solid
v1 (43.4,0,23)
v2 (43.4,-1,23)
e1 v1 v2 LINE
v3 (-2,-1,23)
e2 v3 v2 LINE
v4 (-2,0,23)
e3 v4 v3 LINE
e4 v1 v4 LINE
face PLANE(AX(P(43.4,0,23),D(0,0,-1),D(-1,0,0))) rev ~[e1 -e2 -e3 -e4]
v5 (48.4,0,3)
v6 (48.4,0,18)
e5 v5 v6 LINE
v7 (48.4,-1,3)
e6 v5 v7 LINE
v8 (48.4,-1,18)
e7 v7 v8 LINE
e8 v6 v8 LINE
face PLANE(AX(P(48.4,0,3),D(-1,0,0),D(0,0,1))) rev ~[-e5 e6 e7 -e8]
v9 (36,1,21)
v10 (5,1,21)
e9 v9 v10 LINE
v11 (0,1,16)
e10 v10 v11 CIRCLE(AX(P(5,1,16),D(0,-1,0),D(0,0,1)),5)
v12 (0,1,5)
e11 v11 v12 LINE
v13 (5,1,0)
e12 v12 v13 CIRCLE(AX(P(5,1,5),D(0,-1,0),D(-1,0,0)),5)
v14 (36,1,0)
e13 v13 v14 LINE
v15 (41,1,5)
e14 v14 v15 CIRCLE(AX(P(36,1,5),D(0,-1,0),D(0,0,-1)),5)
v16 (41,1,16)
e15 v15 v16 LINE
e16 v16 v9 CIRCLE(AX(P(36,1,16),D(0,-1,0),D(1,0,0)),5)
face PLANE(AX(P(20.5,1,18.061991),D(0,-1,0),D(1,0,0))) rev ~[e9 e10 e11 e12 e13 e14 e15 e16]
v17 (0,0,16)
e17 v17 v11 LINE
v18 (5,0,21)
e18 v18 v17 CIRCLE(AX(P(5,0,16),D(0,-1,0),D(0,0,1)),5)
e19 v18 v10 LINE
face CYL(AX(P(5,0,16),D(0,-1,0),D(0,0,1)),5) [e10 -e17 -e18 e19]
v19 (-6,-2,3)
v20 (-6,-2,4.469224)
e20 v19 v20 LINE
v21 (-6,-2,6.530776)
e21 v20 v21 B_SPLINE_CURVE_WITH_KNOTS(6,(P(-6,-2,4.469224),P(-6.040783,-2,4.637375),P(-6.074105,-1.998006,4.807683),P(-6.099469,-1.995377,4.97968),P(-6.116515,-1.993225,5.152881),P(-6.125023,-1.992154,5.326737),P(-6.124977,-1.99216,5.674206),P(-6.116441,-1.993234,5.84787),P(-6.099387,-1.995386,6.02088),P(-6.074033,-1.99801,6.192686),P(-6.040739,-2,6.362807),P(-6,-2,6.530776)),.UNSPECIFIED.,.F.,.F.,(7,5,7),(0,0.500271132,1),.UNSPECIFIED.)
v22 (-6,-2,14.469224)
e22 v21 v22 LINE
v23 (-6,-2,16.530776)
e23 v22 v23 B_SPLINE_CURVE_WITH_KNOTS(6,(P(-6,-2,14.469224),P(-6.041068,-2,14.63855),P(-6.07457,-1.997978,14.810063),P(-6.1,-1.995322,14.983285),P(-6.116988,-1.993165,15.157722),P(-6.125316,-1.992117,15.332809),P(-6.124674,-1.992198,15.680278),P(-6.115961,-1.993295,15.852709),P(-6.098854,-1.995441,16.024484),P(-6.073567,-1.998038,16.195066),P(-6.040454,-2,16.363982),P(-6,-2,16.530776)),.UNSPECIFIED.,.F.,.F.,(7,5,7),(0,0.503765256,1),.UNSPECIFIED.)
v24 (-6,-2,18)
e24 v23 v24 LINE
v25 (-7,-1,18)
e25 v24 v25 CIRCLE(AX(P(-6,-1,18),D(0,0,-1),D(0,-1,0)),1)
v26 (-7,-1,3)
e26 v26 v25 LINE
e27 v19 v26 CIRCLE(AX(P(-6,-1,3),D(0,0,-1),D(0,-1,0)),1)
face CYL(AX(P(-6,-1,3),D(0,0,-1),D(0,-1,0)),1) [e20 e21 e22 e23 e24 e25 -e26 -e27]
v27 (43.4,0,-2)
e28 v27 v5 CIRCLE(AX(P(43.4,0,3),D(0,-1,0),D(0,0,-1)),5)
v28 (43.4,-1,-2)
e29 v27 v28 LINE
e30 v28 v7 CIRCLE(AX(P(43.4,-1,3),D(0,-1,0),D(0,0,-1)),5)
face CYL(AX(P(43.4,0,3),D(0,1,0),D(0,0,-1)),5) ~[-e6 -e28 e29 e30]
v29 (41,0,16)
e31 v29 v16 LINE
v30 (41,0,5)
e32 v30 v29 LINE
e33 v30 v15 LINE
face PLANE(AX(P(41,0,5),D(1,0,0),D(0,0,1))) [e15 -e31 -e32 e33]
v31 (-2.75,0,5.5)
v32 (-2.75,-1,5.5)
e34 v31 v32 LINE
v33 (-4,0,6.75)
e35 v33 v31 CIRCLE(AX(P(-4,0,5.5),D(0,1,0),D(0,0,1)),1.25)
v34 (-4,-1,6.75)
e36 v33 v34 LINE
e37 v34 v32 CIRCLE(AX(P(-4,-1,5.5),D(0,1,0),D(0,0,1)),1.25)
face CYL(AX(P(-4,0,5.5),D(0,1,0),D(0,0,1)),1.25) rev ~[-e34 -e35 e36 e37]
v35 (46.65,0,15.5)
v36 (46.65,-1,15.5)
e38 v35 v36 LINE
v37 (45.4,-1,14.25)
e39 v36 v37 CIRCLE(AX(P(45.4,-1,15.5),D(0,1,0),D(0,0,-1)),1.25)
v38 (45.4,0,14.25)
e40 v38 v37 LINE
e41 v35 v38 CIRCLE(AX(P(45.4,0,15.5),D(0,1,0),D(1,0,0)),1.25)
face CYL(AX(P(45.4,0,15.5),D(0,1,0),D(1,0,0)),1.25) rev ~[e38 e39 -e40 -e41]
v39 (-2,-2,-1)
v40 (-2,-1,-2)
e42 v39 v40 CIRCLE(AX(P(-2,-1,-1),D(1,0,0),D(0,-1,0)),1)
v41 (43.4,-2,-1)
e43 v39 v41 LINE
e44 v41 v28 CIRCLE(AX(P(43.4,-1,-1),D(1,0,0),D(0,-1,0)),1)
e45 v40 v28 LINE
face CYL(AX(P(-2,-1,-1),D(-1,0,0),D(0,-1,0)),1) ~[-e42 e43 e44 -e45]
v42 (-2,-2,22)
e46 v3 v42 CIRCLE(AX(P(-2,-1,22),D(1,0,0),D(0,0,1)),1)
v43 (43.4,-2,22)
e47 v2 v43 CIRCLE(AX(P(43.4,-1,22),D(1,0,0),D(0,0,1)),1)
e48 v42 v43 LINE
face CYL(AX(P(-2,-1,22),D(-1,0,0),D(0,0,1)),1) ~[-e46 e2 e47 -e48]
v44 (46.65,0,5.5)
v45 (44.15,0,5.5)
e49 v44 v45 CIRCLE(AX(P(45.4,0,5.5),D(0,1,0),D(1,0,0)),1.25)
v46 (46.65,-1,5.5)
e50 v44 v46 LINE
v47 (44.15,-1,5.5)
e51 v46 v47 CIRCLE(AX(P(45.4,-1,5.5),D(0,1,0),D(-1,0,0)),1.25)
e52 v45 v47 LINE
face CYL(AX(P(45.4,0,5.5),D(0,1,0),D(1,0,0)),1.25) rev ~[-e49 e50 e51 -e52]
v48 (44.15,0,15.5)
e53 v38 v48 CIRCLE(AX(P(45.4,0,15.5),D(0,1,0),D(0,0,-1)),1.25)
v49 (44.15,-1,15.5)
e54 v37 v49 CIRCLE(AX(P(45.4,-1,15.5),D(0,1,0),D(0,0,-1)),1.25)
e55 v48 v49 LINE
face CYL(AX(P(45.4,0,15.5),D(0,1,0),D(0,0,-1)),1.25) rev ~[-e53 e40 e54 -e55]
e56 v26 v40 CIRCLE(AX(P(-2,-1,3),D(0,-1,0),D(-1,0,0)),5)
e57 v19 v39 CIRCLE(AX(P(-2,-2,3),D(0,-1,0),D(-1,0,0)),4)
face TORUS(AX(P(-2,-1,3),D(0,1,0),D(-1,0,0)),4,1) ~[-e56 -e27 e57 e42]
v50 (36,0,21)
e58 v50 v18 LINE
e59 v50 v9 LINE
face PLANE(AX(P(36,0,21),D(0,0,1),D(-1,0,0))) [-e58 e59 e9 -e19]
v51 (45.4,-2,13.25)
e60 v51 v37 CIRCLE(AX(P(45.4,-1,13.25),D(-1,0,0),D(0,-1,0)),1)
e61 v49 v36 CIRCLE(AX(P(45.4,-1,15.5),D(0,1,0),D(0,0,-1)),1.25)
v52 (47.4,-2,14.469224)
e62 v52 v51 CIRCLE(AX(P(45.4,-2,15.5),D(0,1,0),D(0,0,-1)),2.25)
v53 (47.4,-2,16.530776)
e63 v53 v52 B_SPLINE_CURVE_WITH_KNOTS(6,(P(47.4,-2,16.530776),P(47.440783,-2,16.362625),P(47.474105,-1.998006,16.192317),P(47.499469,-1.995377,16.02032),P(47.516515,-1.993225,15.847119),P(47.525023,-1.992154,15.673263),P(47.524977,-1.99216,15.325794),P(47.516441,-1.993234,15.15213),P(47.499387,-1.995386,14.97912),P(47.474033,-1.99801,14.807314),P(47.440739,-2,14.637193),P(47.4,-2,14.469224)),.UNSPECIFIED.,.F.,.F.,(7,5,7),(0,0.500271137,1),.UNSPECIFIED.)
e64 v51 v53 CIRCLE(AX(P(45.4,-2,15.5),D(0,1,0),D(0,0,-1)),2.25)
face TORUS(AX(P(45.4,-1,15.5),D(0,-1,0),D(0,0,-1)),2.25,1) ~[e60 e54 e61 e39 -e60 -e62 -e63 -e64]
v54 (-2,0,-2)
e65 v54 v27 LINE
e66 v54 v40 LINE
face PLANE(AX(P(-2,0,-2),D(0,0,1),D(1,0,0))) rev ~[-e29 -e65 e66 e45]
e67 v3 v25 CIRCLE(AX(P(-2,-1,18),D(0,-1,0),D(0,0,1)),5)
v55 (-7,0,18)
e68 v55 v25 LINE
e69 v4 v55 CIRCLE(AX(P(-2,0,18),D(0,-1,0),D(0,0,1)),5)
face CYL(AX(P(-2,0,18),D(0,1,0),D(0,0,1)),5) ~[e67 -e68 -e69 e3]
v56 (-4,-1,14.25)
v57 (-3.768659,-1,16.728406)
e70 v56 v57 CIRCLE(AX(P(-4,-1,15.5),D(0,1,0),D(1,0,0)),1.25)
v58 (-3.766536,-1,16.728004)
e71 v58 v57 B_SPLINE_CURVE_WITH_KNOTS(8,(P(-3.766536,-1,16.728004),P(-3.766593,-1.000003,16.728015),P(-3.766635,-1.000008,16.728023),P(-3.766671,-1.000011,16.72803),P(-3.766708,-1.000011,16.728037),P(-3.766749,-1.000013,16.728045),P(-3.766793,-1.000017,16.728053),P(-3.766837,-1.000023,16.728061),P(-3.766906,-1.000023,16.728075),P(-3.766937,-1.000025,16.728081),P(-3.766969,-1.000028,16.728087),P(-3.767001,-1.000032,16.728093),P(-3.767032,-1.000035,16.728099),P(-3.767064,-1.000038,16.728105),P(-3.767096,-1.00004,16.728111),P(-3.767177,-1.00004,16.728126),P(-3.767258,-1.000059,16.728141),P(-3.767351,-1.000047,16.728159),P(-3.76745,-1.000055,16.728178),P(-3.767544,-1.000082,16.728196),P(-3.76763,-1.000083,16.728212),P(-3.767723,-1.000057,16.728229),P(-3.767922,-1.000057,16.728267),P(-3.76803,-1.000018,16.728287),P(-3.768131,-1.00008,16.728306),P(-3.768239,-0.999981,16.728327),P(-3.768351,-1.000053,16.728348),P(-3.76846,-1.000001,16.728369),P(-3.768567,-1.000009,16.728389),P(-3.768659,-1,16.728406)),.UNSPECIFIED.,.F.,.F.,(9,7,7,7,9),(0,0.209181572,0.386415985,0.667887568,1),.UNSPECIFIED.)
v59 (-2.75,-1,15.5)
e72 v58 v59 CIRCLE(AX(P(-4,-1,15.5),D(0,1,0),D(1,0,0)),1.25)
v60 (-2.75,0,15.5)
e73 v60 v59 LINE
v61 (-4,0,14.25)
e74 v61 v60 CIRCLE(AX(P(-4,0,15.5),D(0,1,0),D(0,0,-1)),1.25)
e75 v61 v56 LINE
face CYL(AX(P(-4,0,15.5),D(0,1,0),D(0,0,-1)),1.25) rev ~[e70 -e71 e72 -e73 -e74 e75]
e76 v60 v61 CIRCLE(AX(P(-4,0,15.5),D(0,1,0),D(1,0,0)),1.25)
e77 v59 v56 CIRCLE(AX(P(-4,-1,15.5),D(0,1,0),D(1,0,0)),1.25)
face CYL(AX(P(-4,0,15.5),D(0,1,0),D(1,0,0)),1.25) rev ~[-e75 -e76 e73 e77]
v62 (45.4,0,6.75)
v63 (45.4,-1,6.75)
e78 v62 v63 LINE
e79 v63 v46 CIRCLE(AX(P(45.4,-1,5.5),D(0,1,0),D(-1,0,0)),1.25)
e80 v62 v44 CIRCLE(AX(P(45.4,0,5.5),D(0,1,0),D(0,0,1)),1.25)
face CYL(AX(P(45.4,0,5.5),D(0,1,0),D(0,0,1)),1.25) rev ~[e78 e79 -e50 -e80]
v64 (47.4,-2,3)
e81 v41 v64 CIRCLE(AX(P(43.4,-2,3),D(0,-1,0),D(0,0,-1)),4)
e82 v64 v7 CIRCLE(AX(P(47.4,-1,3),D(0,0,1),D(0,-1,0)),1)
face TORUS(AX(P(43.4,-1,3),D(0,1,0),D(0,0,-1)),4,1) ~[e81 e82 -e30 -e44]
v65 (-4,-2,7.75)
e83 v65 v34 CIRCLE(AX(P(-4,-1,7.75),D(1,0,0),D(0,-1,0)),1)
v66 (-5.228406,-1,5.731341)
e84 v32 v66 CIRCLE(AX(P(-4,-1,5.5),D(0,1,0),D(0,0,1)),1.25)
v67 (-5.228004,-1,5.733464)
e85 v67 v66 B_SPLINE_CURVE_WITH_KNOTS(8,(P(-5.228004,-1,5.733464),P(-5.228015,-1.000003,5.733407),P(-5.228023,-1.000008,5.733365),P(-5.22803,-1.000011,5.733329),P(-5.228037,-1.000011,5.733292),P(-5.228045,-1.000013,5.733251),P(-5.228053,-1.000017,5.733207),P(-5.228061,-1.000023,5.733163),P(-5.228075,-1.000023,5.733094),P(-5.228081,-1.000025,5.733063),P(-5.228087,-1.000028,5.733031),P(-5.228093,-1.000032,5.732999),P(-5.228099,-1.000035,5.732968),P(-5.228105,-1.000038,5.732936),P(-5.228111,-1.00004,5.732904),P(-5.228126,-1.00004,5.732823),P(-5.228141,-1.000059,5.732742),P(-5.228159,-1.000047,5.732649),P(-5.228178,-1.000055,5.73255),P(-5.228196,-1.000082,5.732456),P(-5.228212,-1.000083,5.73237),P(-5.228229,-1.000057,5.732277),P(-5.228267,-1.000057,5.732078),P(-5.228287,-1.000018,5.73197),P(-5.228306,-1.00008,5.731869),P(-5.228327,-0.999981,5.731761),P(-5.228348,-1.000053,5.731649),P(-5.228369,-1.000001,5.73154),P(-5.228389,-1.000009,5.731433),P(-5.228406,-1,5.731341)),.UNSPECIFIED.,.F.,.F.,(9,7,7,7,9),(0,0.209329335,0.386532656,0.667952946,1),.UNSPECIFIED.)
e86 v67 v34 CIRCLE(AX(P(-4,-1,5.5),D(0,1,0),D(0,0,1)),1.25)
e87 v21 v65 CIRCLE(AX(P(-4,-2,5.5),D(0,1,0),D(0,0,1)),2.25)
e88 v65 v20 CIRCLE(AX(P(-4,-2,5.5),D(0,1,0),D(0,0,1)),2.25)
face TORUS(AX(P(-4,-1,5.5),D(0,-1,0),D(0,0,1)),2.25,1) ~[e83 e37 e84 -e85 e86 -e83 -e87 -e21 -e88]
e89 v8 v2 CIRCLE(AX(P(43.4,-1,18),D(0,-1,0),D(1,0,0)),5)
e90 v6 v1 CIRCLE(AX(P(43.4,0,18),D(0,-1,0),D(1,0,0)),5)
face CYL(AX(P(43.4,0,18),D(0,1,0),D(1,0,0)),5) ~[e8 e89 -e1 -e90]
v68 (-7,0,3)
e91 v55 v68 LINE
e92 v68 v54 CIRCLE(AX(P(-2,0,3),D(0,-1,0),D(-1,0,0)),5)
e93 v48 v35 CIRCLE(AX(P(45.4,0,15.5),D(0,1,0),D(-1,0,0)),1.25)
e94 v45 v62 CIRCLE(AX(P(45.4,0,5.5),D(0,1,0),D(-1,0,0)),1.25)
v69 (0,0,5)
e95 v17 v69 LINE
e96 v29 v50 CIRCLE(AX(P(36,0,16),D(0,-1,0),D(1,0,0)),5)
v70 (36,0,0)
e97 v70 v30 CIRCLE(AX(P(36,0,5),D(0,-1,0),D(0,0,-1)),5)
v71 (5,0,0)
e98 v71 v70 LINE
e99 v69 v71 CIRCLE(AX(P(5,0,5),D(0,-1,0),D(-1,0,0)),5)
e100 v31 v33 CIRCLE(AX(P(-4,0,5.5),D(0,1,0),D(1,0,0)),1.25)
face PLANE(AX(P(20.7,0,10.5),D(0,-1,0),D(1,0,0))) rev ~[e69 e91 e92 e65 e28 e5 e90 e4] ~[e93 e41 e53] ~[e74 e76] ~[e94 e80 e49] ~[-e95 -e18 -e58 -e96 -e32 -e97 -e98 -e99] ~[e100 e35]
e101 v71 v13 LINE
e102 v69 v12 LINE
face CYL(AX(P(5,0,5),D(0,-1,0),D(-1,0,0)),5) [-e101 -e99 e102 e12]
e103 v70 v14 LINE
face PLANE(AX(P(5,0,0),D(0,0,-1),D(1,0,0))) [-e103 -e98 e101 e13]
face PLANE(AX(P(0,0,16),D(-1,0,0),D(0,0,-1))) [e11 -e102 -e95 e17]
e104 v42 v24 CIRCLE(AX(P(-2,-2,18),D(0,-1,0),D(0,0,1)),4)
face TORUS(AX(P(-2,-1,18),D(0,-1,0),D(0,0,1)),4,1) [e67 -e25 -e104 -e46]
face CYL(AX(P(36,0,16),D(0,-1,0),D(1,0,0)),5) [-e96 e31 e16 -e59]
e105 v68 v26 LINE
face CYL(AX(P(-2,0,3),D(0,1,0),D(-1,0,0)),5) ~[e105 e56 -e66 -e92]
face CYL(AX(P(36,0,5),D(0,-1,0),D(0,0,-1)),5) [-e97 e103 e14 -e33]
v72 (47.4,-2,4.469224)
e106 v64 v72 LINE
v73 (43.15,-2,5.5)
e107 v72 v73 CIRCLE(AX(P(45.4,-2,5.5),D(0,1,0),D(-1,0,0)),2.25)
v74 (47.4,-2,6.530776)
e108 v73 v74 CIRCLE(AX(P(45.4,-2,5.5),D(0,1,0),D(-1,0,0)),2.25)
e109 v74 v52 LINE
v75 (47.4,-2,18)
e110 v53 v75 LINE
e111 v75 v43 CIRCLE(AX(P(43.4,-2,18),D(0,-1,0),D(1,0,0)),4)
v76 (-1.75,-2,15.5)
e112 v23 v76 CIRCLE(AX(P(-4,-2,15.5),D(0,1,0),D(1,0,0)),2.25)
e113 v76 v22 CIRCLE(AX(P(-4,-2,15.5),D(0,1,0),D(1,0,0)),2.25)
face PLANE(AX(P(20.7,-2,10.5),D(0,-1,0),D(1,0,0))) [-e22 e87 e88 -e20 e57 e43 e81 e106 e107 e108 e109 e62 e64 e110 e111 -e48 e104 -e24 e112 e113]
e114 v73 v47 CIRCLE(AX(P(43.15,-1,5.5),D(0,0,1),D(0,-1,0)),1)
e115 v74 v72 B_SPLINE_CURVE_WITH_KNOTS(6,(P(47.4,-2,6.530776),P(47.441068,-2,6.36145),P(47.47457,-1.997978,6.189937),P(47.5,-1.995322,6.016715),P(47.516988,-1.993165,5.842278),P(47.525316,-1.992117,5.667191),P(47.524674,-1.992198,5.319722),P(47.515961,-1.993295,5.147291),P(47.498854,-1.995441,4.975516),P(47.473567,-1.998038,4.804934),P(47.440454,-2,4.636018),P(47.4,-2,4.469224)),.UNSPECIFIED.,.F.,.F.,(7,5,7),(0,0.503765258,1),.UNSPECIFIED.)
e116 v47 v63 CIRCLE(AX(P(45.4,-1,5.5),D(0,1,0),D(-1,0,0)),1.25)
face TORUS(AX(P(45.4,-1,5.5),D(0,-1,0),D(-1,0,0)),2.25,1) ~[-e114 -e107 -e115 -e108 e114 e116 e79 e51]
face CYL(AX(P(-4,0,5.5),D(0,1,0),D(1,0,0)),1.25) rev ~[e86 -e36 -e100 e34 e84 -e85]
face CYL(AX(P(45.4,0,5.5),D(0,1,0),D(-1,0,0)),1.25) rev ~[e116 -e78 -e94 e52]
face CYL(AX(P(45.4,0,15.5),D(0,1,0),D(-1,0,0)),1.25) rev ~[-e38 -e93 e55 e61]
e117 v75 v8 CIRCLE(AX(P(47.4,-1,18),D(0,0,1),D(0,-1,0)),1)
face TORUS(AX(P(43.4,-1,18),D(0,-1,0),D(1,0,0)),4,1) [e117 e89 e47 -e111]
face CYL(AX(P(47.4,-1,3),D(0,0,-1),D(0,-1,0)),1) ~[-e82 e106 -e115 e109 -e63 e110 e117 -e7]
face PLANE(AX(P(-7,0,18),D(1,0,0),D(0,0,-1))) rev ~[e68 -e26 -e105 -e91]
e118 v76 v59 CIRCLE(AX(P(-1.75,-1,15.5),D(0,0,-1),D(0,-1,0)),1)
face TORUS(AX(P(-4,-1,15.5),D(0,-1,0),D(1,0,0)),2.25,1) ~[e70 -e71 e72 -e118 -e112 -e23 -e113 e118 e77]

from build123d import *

# Parameters (mm, degrees)
F0_W         = 41
F0_H         = 10
F1_DEPTH     = 2
F2_DEPTH     = 1
F3_T1_DEPTH  = 45.4
F3_T3_DEPTH  = 15
F3_T6_ANGLE  = 90
F3_T8_ANGLE  = 90
F3_T10_ANGLE = 90
F3_T12_ANGLE = 90


# Not quite as in the source:
# - a fillet or chamfer that OpenCascade refuses, or shapes differently, is made with other operations: its cross-section is extruded or revolved along the edge and cut away or added


with BuildPart() as f1:
    # F0 (on Front) → F1 (new body)
    with BuildSketch(Plane.XZ):
        with BuildLine():
            Line((43.4, 23), (-2, 23))
            ThreePointArc((-2, 23), (-5.5355339059, 21.5355339059), (-7, 18))
            Line((-7, 18), (-7, 3))
            ThreePointArc((-7, 3), (-5.5355339059, -0.5355339059), (-2, -2))
            Line((-2, -2), (43.4, -2))
            ThreePointArc((43.4, -2), (46.9355339059, -0.5355339059), (48.4, 3))
            Line((48.4, 3), (48.4, 18))
            ThreePointArc((48.4, 18), (46.9355339059, 21.5355339059), (43.4, 23))
        make_face()
        with BuildLine():
            Line((36, 0), (5, 0))
            ThreePointArc((5, 0), (1.4644660941, 1.4644660941), (0, 5))
            Line((0, 5), (0, 5.5))
            Line((0, 5.5), (-2.75, 5.5))
            ThreePointArc((-2.75, 5.5), (-4.8838834765, 4.6161165235), (-4, 6.75))
            Line((-4, 6.75), (-4, 14.25))
            ThreePointArc((-4, 14.25), (-4.8838834765, 16.3838834765), (-2.75, 15.5))
            Line((-2.75, 15.5), (0, 15.5))
            Line((0, 15.5), (0, 16))
            ThreePointArc((0, 16), (1.4644660941, 19.5355339059), (5, 21))
            Line((5, 21), (36, 21))
            ThreePointArc((36, 21), (39.5355339059, 19.5355339059), (41, 16))
            Line((41, 16), (41, 15.5))
            Line((41, 15.5), (44.15, 15.5))
            ThreePointArc((44.15, 15.5), (45.4, 16.75), (46.65, 15.5))
            ThreePointArc((46.65, 15.5), (46.2838834765, 14.6161165235), (45.4, 14.25))
            Line((45.4, 14.25), (45.4, 6.75))
            ThreePointArc((45.4, 6.75), (46.2838834765, 6.3838834765), (46.65, 5.5))
            ThreePointArc((46.65, 5.5), (45.4, 4.25), (44.15, 5.5))
            Line((44.15, 5.5), (41, 5.5))
            Line((41, 5.5), (41, 5))
            ThreePointArc((41, 5), (39.5355339059, 1.4644660941), (36, 0))
        make_face(mode=Mode.SUBTRACT)
        with BuildLine():
            Line((0, 16), (0, 15.5))
            Line((0, 15.5), (41, 15.5))
            Line((41, 15.5), (41, 16))
            ThreePointArc((41, 16), (39.5355339059, 19.5355339059), (36, 21))
            Line((36, 21), (5, 21))
            ThreePointArc((5, 21), (1.4644660941, 19.5355339059), (0, 16))
        make_face()
        with BuildLine():
            Line((-2.75, 5.5), (0, 5.5))
            Line((0, 5.5), (0, 15.5))
            Line((0, 15.5), (-2.75, 15.5))
            ThreePointArc((-2.75, 15.5), (-3.1161165235, 14.6161165235), (-4, 14.25))
            Line((-4, 14.25), (-4, 6.75))
            ThreePointArc((-4, 6.75), (-3.1161165235, 6.3838834765), (-2.75, 5.5))
        make_face()
        with Locations((20.5, 10.5)):
            Rectangle(F0_W, F0_H)
        with BuildLine():
            Line((41, 15.5), (41, 5.5))
            Line((41, 5.5), (44.15, 5.5))
            ThreePointArc((44.15, 5.5), (44.5161165235, 6.3838834765), (45.4, 6.75))
            Line((45.4, 6.75), (45.4, 14.25))
            ThreePointArc((45.4, 14.25), (44.5161165235, 14.6161165235), (44.15, 15.5))
            Line((44.15, 15.5), (41, 15.5))
        make_face()
        with BuildLine():
            ThreePointArc((0, 5), (1.4644660941, 1.4644660941), (5, 0))
            Line((5, 0), (36, 0))
            ThreePointArc((36, 0), (39.5355339059, 1.4644660941), (41, 5))
            Line((41, 5), (41, 5.5))
            Line((41, 5.5), (0, 5.5))
            Line((0, 5.5), (0, 5))
        make_face()
    extrude(amount=F1_DEPTH)

    # F0 (on Front) → F2 (join)
    with BuildSketch(Plane.XZ):
        with BuildLine():
            Line((0, 16), (0, 15.5))
            Line((0, 15.5), (41, 15.5))
            Line((41, 15.5), (41, 16))
            ThreePointArc((41, 16), (39.5355339059, 19.5355339059), (36, 21))
            Line((36, 21), (5, 21))
            ThreePointArc((5, 21), (1.4644660941, 19.5355339059), (0, 16))
        make_face()
        with Locations((20.5, 10.5)):
            Rectangle(F0_W, F0_H)
        with BuildLine():
            ThreePointArc((0, 5), (1.4644660941, 1.4644660941), (5, 0))
            Line((5, 0), (36, 0))
            ThreePointArc((36, 0), (39.5355339059, 1.4644660941), (41, 5))
            Line((41, 5), (41, 5.5))
            Line((41, 5.5), (0, 5.5))
            Line((0, 5.5), (0, 5))
        make_face()
    extrude(amount=-F2_DEPTH)

    # F3: fillet of radius 1 on 12 edges, made by hand

    # F3_s2 → F3_t1 (cut)
    with BuildSketch(Plane.YZ.offset(-2)):
        with BuildLine():
            ThreePointArc((-1, 23), (-1.7071067812, 22.7071067812), (-2, 22))
            Line((-2, 22), (-2, 23))
            Line((-2, 23), (-1, 23))
        make_face()
        with BuildLine():
            ThreePointArc((-2, -1), (-1.7071067812, -1.7071067812), (-1, -2))
            Line((-1, -2), (-2, -2))
            Line((-2, -2), (-2, -1))
        make_face()
    extrude(amount=F3_T1_DEPTH, mode=Mode.SUBTRACT)

    # F3_s4 → F3_t3 (cut)
    with BuildSketch(Plane.XY.offset(3)):
        with BuildLine():
            ThreePointArc((-6, -2), (-6.7071067812, -1.7071067812), (-7, -1))
            Line((-7, -1), (-7, -2))
            Line((-7, -2), (-6, -2))
        make_face()
        with BuildLine():
            ThreePointArc((47.4, -2), (48.1071067812, -1.7071067812), (48.4, -1))
            Line((48.4, -1), (48.4, -2))
            Line((48.4, -2), (47.4, -2))
        make_face()
    extrude(amount=F3_T3_DEPTH, mode=Mode.SUBTRACT)

    # F3_s5 → F3_t6 (revolve, cut)
    with BuildSketch(Plane.YZ.offset(-2)):
        with BuildLine():
            ThreePointArc((-1, 23), (-1.7071067812, 22.7071067812), (-2, 22))
            Line((-2, 22), (-2, 23))
            Line((-2, 23), (-1, 23))
        make_face()
    revolve(axis=Axis((-2, -2, 18), (0, -1, 0)), revolution_arc=F3_T6_ANGLE, mode=Mode.SUBTRACT)

    # F3_s7 → F3_t8 (revolve, cut)
    with BuildSketch(Plane.XY.offset(3)):
        with BuildLine():
            ThreePointArc((-6, -2), (-6.7071067812, -1.7071067812), (-7, -1))
            Line((-7, -1), (-7, -2))
            Line((-7, -2), (-6, -2))
        make_face()
    revolve(axis=Axis((-2, -2, 3), (0, -1, 0)), revolution_arc=F3_T8_ANGLE, mode=Mode.SUBTRACT)

    # F3_s9 → F3_t10 (revolve, cut)
    with BuildSketch(Plane.YZ.offset(43.4)):
        with BuildLine():
            ThreePointArc((-2, -1), (-1.7071067812, -1.7071067812), (-1, -2))
            Line((-1, -2), (-2, -2))
            Line((-2, -2), (-2, -1))
        make_face()
    revolve(axis=Axis((43.4, -2, 3), (0, -1, 0)), revolution_arc=F3_T10_ANGLE, mode=Mode.SUBTRACT)

    # F3_s11 → F3_t12 (revolve, cut)
    with BuildSketch(Plane.XY.offset(18)):
        with BuildLine():
            ThreePointArc((48.4, -1), (48.1071067812, -1.7071067812), (47.4, -2))
            Line((47.4, -2), (48.4, -2))
            Line((48.4, -2), (48.4, -1))
        make_face()
    revolve(axis=Axis((43.4, -2, 18), (0, -1, 0)), revolution_arc=F3_T12_ANGLE, mode=Mode.SUBTRACT)

    # F3_s13 → F3_t14 (revolve, cut)
    with BuildSketch(Plane.YZ.offset(-4)):
        with BuildLine():
            ThreePointArc((-2, 7.75), (-1.7071067812, 7.0428932188), (-1, 6.75))
            Line((-1, 6.75), (-2, 6.75))
            Line((-2, 6.75), (-2, 7.75))
        make_face()
    revolve(axis=Axis((-4, -2, 5.5), (0, 1, 0)), mode=Mode.SUBTRACT)

    # F3_s15 → F3_t16 (revolve, cut)
    with BuildSketch(Plane.XY.offset(15.5)):
        with BuildLine():
            ThreePointArc((-1.75, -2), (-2.4571067812, -1.7071067812), (-2.75, -1))
            Line((-2.75, -1), (-2.75, -2))
            Line((-2.75, -2), (-1.75, -2))
        make_face()
    revolve(axis=Axis((-4, -2, 15.5), (0, 1, 0)), mode=Mode.SUBTRACT)

    # F3_s17 → F3_t18 (revolve, cut)
    with BuildSketch(Plane.XY.offset(5.5)):
        with BuildLine():
            ThreePointArc((43.15, -2), (43.8571067812, -1.7071067812), (44.15, -1))
            Line((44.15, -1), (44.15, -2))
            Line((44.15, -2), (43.15, -2))
        make_face()
    revolve(axis=Axis((45.4, -2, 5.5), (0, 1, 0)), mode=Mode.SUBTRACT)

    # F3_s19 → F3_t20 (revolve, cut)
    with BuildSketch(Plane.YZ.offset(45.4)):
        with BuildLine():
            ThreePointArc((-2, 13.25), (-1.7071067812, 13.9571067812), (-1, 14.25))
            Line((-1, 14.25), (-2, 14.25))
            Line((-2, 14.25), (-2, 13.25))
        make_face()
    revolve(axis=Axis((45.4, -2, 15.5), (0, 1, 0)), mode=Mode.SUBTRACT)


solid = f1.part
